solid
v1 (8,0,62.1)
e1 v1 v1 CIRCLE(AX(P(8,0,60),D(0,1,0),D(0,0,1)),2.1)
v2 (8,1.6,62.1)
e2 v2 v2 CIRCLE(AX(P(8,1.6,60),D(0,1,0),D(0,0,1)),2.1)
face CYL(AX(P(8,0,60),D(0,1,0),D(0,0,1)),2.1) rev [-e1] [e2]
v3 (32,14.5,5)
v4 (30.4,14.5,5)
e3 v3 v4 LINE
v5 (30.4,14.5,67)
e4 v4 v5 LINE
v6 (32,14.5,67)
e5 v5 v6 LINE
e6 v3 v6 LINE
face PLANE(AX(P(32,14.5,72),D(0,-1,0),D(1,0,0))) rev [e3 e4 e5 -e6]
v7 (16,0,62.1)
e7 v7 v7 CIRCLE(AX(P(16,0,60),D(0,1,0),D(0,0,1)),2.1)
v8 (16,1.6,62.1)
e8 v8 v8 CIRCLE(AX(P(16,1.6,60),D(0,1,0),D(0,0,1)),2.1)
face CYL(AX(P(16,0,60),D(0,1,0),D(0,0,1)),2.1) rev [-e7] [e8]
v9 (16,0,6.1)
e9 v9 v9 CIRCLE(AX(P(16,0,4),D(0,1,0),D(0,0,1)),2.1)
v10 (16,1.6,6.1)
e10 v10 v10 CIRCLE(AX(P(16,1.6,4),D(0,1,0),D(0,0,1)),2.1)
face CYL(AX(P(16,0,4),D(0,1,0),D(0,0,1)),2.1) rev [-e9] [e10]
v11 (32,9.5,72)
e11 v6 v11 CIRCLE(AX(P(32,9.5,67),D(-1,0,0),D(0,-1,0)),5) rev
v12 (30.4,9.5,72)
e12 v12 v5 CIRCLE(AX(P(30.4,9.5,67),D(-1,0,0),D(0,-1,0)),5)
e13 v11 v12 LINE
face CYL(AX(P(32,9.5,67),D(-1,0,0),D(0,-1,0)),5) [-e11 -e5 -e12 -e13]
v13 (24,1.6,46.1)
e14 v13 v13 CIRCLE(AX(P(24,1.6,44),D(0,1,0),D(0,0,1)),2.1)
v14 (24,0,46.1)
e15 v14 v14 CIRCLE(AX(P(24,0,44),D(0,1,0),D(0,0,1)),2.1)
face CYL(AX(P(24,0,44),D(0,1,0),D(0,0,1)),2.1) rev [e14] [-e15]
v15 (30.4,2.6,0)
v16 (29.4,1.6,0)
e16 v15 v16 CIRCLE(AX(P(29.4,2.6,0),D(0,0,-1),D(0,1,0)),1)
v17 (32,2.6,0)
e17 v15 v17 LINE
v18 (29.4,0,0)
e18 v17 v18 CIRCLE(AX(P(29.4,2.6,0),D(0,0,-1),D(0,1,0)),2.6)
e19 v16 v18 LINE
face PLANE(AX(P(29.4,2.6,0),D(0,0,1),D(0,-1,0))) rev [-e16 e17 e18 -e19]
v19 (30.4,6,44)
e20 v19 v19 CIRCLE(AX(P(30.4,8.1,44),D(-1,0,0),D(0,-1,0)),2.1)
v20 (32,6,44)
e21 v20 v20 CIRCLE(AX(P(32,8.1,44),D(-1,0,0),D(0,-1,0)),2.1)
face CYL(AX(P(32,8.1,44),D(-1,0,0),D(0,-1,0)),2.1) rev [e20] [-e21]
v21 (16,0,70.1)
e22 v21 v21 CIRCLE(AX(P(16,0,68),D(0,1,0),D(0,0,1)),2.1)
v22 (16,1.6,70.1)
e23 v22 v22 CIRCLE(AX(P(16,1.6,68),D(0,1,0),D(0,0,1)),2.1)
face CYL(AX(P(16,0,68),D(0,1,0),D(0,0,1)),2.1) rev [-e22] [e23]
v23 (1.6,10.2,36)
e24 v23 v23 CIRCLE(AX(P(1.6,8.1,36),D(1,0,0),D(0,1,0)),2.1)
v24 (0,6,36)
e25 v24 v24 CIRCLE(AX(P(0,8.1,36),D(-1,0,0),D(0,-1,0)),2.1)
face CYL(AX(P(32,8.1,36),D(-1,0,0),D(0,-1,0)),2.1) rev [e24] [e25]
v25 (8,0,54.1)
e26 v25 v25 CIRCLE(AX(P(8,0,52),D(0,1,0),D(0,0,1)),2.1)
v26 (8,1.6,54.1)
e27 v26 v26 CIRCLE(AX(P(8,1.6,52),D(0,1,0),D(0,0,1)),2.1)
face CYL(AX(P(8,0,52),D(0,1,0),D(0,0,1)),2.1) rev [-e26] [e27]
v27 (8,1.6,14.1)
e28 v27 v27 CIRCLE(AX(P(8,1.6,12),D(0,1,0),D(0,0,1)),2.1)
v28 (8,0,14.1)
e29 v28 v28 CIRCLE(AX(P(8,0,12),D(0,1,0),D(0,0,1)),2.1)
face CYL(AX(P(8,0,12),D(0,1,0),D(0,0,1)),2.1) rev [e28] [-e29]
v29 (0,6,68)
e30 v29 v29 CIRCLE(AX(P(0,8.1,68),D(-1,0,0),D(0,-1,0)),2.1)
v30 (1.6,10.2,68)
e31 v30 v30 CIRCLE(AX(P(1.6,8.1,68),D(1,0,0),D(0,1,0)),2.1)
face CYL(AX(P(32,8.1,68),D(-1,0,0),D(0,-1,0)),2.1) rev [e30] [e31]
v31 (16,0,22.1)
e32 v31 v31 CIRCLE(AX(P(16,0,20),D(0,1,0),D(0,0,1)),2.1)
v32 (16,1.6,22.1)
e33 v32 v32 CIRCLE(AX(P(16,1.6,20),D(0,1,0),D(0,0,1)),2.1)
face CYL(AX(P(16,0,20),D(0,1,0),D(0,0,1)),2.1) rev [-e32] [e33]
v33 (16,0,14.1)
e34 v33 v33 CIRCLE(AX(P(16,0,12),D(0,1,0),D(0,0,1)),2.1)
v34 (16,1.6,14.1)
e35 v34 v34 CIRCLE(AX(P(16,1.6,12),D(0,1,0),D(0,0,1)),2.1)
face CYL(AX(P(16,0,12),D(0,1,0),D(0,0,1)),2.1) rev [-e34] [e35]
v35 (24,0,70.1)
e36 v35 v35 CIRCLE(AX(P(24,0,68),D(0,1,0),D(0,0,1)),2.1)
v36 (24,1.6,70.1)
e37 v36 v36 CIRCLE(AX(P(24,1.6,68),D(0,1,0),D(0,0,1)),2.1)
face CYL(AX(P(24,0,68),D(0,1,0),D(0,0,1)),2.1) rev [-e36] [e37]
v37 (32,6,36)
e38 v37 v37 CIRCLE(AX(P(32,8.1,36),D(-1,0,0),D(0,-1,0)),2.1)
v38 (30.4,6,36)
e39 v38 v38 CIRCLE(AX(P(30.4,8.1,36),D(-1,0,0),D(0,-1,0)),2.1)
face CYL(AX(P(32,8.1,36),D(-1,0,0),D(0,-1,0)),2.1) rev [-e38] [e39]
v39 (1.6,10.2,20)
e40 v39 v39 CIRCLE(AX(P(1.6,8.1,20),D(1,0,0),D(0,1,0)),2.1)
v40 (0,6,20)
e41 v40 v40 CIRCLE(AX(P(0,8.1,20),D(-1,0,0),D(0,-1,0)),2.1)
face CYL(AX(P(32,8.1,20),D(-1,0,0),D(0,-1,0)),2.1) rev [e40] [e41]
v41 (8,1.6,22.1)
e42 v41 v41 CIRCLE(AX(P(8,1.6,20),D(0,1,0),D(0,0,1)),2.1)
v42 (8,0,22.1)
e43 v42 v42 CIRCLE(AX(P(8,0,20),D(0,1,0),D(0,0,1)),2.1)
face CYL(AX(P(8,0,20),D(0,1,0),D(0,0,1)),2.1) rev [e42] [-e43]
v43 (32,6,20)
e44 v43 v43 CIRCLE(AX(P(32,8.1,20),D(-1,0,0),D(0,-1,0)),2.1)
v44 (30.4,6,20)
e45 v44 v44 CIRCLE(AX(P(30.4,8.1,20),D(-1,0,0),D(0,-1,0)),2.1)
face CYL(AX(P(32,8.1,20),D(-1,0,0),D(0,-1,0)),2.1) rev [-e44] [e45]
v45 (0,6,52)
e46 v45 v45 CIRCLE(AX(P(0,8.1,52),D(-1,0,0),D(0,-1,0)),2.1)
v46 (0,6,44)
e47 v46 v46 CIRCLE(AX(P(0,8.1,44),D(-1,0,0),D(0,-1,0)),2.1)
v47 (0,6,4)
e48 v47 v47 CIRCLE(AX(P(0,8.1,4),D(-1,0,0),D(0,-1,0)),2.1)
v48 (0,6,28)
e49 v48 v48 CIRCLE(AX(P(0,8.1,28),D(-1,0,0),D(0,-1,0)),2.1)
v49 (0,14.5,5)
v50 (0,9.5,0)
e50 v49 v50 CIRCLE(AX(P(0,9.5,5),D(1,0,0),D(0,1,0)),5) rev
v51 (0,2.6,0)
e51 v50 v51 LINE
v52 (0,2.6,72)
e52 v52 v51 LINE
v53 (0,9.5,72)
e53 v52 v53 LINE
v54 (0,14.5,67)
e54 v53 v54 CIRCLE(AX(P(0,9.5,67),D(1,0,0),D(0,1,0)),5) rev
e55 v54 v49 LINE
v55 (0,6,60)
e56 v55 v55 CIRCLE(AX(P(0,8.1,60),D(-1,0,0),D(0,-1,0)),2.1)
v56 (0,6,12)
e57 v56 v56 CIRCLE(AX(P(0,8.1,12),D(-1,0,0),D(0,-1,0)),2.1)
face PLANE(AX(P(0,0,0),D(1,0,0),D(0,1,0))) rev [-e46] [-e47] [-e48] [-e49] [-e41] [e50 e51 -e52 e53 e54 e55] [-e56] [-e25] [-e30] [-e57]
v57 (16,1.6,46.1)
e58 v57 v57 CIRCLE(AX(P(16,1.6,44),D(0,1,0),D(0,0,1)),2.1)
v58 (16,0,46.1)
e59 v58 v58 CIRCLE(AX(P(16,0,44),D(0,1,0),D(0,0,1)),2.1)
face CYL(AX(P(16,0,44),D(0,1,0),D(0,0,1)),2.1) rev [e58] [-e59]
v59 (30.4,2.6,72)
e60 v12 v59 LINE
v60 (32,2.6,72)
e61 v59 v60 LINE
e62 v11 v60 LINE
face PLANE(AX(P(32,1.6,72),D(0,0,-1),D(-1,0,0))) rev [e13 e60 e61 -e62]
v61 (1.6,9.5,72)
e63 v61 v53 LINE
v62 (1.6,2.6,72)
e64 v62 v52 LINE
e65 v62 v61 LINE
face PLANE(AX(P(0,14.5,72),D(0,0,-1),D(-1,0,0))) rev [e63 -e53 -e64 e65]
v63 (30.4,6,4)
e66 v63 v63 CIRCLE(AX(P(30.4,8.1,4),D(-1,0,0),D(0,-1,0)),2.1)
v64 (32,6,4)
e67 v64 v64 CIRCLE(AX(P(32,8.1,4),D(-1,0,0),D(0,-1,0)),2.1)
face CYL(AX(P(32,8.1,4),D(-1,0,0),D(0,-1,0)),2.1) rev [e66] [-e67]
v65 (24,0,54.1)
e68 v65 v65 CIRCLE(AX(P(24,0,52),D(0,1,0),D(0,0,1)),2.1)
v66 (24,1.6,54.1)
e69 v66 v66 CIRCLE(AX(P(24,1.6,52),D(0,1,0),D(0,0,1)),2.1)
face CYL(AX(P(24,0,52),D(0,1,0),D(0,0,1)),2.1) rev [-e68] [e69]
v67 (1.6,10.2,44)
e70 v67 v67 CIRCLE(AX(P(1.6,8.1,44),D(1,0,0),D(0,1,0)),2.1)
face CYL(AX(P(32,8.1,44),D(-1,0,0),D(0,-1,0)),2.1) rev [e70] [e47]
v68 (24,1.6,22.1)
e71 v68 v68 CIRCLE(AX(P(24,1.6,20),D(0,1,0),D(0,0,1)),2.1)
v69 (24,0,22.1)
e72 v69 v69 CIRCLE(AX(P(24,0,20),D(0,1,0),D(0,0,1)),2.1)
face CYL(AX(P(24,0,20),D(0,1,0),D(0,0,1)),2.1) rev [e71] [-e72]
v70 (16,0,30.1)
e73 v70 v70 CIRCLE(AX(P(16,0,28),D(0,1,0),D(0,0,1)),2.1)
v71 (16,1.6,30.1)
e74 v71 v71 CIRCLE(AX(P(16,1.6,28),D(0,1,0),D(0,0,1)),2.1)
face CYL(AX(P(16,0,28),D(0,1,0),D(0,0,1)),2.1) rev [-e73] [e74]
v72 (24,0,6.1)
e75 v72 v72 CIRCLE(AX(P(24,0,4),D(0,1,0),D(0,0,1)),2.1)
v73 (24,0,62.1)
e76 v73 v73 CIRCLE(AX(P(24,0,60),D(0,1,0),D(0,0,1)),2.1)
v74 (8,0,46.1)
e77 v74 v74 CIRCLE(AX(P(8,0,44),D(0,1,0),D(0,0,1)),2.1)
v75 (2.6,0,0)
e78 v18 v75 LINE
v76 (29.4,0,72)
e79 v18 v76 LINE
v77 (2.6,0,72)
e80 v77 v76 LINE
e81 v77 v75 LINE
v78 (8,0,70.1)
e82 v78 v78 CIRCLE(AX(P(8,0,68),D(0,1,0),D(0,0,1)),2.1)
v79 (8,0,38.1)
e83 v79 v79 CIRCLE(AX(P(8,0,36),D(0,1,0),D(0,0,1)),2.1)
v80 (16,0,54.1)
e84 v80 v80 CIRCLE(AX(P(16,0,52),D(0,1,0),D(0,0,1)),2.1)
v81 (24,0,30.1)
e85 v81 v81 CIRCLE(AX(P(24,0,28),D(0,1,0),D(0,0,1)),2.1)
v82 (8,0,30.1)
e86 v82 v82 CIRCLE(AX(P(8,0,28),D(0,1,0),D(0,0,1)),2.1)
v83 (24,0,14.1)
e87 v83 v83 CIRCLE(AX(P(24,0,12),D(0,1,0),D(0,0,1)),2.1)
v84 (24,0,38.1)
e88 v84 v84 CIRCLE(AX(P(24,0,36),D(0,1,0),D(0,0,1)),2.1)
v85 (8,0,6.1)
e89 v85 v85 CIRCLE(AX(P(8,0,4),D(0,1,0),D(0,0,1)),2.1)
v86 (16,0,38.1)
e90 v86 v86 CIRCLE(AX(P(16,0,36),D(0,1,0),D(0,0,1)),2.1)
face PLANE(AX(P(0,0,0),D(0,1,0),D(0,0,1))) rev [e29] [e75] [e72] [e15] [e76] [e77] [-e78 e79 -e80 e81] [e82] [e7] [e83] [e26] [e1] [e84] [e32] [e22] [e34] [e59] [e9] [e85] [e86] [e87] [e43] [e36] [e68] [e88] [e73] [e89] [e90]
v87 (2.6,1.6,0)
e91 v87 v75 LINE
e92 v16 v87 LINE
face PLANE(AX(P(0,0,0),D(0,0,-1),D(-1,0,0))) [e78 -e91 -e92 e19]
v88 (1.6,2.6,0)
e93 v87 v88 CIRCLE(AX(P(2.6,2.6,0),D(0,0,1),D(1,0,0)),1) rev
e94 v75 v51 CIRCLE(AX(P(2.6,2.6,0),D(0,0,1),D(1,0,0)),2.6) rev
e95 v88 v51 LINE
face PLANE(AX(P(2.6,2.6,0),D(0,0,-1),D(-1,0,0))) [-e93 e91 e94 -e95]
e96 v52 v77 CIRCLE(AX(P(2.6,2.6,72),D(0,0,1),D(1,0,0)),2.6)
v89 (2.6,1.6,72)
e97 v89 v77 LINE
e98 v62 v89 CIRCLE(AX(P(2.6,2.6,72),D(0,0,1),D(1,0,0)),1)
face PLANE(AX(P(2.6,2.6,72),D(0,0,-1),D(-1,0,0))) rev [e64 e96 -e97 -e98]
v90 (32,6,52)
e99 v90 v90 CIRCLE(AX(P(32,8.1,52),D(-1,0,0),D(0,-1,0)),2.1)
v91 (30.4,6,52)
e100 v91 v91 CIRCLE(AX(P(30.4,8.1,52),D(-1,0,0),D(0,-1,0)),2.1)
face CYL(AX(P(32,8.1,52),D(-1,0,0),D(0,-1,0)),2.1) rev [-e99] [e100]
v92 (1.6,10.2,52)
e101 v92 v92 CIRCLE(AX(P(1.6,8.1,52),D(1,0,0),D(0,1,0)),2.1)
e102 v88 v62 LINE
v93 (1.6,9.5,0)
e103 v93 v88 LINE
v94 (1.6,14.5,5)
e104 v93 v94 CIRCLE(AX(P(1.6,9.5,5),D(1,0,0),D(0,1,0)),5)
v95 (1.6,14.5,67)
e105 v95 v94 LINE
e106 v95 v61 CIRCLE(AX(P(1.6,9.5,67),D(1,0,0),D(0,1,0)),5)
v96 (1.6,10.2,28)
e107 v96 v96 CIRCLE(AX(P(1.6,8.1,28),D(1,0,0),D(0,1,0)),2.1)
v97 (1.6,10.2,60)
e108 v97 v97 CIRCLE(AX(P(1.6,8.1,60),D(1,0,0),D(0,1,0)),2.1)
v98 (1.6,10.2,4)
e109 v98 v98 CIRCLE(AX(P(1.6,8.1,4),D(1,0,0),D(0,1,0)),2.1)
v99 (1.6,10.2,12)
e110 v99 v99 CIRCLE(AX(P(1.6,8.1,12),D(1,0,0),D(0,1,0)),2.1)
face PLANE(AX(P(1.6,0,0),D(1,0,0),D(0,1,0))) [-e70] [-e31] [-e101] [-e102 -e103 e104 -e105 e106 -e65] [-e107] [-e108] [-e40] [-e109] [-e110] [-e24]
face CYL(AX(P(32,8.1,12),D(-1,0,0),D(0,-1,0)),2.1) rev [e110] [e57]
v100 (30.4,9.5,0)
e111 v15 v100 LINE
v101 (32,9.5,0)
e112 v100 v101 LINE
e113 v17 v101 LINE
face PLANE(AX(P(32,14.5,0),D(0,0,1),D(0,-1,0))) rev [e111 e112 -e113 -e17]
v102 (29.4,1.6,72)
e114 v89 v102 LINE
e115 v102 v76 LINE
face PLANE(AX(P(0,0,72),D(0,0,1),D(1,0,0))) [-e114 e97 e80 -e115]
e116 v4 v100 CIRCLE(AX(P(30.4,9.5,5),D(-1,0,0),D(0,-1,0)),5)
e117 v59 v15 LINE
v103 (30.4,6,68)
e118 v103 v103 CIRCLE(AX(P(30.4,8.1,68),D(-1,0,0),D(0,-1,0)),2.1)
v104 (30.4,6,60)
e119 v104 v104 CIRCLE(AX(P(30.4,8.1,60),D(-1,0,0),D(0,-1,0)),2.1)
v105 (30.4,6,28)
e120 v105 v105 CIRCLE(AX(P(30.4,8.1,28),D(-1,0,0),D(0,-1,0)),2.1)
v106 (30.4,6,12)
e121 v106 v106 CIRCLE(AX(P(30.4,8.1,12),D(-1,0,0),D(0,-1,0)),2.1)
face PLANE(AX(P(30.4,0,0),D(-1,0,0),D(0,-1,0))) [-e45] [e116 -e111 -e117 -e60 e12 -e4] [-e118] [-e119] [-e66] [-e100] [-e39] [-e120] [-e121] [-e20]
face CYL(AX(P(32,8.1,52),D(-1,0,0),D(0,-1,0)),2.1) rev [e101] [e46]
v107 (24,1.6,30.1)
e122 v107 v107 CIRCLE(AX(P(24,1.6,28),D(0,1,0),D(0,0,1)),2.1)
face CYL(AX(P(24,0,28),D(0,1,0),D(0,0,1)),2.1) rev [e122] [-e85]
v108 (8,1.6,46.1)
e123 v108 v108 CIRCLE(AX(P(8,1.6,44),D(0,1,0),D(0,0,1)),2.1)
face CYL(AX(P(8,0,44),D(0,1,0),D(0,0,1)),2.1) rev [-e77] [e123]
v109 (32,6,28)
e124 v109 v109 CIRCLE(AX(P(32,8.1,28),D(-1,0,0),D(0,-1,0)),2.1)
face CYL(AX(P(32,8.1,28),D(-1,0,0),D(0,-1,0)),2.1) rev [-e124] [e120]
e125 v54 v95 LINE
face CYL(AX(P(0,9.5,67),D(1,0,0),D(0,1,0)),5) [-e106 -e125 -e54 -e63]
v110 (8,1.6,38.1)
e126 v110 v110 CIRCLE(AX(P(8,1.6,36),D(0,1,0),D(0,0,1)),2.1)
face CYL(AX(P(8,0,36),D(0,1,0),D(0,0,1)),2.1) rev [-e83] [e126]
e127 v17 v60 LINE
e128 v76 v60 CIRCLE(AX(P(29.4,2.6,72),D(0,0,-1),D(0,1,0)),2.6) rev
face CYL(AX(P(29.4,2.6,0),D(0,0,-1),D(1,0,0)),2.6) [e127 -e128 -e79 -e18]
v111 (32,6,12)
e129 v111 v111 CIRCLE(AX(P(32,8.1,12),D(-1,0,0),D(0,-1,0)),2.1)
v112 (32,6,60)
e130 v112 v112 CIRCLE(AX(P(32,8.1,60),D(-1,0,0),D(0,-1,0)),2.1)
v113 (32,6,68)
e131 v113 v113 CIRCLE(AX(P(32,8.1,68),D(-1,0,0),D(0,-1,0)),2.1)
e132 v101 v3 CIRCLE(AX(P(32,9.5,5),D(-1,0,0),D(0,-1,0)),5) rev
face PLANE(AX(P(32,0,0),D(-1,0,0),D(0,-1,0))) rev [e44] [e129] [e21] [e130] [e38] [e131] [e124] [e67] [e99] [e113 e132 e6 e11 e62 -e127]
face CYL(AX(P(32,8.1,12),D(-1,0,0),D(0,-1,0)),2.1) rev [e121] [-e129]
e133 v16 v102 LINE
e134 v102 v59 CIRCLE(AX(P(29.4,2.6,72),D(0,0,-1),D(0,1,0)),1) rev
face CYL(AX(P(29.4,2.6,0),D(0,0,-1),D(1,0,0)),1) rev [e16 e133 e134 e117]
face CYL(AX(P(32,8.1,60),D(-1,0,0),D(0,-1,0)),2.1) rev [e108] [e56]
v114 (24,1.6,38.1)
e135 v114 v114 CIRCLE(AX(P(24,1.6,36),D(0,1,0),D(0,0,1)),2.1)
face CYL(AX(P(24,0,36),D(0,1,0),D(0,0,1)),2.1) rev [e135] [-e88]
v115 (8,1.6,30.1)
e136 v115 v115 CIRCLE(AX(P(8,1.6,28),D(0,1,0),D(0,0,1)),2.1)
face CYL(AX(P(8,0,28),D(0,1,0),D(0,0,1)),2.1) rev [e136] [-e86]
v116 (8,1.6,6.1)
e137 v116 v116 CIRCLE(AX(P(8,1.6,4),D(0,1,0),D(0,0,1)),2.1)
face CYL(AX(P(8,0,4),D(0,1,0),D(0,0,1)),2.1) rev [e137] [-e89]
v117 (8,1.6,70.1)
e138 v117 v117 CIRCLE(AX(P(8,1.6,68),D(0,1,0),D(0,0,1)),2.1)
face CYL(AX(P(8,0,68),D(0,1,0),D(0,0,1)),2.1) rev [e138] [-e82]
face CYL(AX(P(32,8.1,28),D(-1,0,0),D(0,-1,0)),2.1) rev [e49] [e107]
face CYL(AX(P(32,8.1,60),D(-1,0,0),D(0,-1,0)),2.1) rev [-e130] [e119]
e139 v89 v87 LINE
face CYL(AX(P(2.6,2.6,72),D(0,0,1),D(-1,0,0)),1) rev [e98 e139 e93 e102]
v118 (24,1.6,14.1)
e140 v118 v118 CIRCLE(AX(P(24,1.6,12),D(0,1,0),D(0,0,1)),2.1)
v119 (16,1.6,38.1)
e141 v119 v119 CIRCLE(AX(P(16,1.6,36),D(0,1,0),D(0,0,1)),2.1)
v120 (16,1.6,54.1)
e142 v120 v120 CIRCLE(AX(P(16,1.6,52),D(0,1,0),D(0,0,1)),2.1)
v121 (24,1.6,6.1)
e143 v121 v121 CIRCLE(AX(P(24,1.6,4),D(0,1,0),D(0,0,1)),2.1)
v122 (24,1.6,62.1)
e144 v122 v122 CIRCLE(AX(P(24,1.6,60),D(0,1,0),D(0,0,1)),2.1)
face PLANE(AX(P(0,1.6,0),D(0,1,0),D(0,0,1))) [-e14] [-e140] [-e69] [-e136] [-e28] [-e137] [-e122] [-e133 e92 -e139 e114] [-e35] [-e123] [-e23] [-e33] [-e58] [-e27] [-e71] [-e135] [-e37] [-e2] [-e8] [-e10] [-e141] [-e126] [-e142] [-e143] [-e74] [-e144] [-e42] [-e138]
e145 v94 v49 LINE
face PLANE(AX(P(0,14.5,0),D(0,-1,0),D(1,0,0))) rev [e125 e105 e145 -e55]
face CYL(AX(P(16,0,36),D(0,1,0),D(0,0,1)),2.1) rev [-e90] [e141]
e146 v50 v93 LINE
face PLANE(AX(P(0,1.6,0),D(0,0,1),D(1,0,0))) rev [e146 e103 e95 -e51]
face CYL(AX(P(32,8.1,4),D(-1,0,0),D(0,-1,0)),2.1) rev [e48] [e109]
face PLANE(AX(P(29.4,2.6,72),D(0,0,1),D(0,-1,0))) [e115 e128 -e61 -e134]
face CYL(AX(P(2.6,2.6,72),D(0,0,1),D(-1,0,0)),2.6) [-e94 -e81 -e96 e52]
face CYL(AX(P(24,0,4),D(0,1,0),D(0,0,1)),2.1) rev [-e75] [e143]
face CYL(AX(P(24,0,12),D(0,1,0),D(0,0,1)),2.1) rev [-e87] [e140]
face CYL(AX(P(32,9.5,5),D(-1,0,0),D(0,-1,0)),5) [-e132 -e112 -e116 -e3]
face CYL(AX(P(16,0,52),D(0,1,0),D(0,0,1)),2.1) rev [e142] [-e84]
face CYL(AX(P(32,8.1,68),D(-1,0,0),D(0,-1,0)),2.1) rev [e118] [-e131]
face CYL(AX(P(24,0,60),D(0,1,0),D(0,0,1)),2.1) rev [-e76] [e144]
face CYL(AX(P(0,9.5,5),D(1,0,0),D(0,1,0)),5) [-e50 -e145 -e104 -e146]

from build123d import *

# Parameters (mm, degrees)
SKETCH1_W                      = 32
SKETCH1_H                      = 72
BOSS_EXTRUDE1_DEPTH            = 1.6
SKETCH2_R                      = 2.1
CUT_EXTRUDE1_DEPTH             = 79.807106279
LPATTERN1_COUNT                = 3
LPATTERN1_PITCH                = 8
LPATTERN1_COUNT_DIR2           = 9
LPATTERN1_PITCH_DIR2           = 8
EDGE_FLANGE1_STRIP_W           = 8.4
EDGE_FLANGE1_STRIP_H           = 1.6
EDGE_FLANGE1_STRIP_CUT_DEPTH   = 72
EDGE_FLANGE1_STRIP_2_W         = 8.4
EDGE_FLANGE1_STRIP_2_H         = 1.6
EDGE_FLANGE1_STRIP_CUT_2_DEPTH = 72
EDGE_FLANGE1_DEPTH             = 72
EDGE_FLANGE1_BEND_DEPTH        = 72
FILLET1_R                      = 5
SKETCH14_R                     = 2.1
CUT_EXTRUDE2_DEPTH             = 81.113981302
LPATTERN2_COUNT                = 9
LPATTERN2_PITCH                = 8


# Sheet-metal steps are written as plain solids
with BuildPart() as part:
    # Sketch1 → Boss-Extrude1 (new body)
    with BuildSketch(Plane(origin=(0, 0, 0), x_dir=(1, 0, 0), z_dir=(0, 1, 0))):
        with Locations((16, -36)):
            Rectangle(SKETCH1_W, SKETCH1_H)
    extrude(amount=BOSS_EXTRUDE1_DEPTH)

    # Sketch2 → Cut-Extrude1 (cut, through all)
    with BuildSketch(Plane(origin=(0, 1.6, 0), x_dir=(1, 0, 0), z_dir=(0, 1, 0))):
        with Locations(Location((8, -4, 0), (0, 0, 270))):
            Circle(SKETCH2_R)
    cut_extrude1 = extrude(amount=-CUT_EXTRUDE1_DEPTH, mode=Mode.SUBTRACT)

    # LPattern1: Cut-Extrude1 3 × 9
    with Locations(*[(i * LPATTERN1_PITCH, 0, j * LPATTERN1_PITCH_DIR2) for i in range(LPATTERN1_COUNT) for j in range(LPATTERN1_COUNT_DIR2) if (i, j) != (0, 0)]):
        add(cut_extrude1, mode=Mode.SUBTRACT)

    # Edge-Flange1 strip (across the edge) → Edge-Flange1 strip cut (cut)
    with BuildSketch(Plane(origin=(32, 1.6, 72), x_dir=(-1, 0, 0), z_dir=(0, 0, -1))):
        with Locations((-1.6, -0.8)):
            Rectangle(EDGE_FLANGE1_STRIP_W, EDGE_FLANGE1_STRIP_H)
    extrude(amount=EDGE_FLANGE1_STRIP_CUT_DEPTH, mode=Mode.SUBTRACT)

    # Edge-Flange1 strip 2 (across the edge) → Edge-Flange1 strip cut 2 (cut)
    with BuildSketch(Plane(origin=(0, 1.6, 0), x_dir=(1, 0, 0), z_dir=(0, 0, 1))):
        with Locations((-1.6, -0.8)):
            Rectangle(EDGE_FLANGE1_STRIP_2_W, EDGE_FLANGE1_STRIP_2_H)
    extrude(amount=EDGE_FLANGE1_STRIP_CUT_2_DEPTH, mode=Mode.SUBTRACT)

    # Edge-Flange1 section (across the edge) → Edge-Flange1 (add)
    with BuildSketch(Plane(origin=(32, 1.6, 72), x_dir=(-1, 0, 0), z_dir=(0, 0, -1))):
        with BuildLine():
            Line((0, 1), (0, 12.9))
            Line((0, 12.9), (1.6, 12.9))
            Line((1.6, 12.9), (1.6, 1))
            ThreePointArc((1.6, 1), (1.892893219, 0.292893219), (2.6, 0))
            Line((2.6, 0), (2.6, -1.6))
            ThreePointArc((2.6, -1.6), (0.761522369, -0.838477631), (0, 1))
        make_face()
    extrude(amount=EDGE_FLANGE1_DEPTH)

    # Edge-Flange1 section 2 (across the edge) → Edge-Flange1 bend (add)
    with BuildSketch(Plane(origin=(0, 1.6, 0), x_dir=(1, 0, 0), z_dir=(0, 0, 1))):
        with BuildLine():
            Line((0, 1), (0, 12.9))
            Line((0, 12.9), (1.6, 12.9))
            Line((1.6, 12.9), (1.6, 1))
            ThreePointArc((1.6, 1), (1.892893219, 0.292893219), (2.6, 0))
            Line((2.6, 0), (2.6, -1.6))
            ThreePointArc((2.6, -1.6), (0.761522369, -0.838477631), (0, 1))
        make_face()
    extrude(amount=EDGE_FLANGE1_BEND_DEPTH)

    # Fillet1
    fillet1_edges = [part.edges().sort_by_distance(p)[0] for p in [
        (31.2, 14.5, 72),
        (31.2, 14.5, 0),
        (0.8, 14.5, 0),
        (0.8, 14.5, 72),
    ]]
    fillet(fillet1_edges, radius=FILLET1_R)

    # Sketch14 → Cut-Extrude2 (cut, through all)
    with BuildSketch(Plane.ZY):
        with Locations(Location((4, 8.1, 0), (0, 0, 270))):
            Circle(SKETCH14_R)
    cut_extrude2 = extrude(amount=-CUT_EXTRUDE2_DEPTH, mode=Mode.SUBTRACT)

    # LPattern2: Cut-Extrude2 ×9
    with Locations(*[(0, 0, i * LPATTERN2_PITCH) for i in range(1, LPATTERN2_COUNT)]):
        add(cut_extrude2, mode=Mode.SUBTRACT)


solid = part.part
